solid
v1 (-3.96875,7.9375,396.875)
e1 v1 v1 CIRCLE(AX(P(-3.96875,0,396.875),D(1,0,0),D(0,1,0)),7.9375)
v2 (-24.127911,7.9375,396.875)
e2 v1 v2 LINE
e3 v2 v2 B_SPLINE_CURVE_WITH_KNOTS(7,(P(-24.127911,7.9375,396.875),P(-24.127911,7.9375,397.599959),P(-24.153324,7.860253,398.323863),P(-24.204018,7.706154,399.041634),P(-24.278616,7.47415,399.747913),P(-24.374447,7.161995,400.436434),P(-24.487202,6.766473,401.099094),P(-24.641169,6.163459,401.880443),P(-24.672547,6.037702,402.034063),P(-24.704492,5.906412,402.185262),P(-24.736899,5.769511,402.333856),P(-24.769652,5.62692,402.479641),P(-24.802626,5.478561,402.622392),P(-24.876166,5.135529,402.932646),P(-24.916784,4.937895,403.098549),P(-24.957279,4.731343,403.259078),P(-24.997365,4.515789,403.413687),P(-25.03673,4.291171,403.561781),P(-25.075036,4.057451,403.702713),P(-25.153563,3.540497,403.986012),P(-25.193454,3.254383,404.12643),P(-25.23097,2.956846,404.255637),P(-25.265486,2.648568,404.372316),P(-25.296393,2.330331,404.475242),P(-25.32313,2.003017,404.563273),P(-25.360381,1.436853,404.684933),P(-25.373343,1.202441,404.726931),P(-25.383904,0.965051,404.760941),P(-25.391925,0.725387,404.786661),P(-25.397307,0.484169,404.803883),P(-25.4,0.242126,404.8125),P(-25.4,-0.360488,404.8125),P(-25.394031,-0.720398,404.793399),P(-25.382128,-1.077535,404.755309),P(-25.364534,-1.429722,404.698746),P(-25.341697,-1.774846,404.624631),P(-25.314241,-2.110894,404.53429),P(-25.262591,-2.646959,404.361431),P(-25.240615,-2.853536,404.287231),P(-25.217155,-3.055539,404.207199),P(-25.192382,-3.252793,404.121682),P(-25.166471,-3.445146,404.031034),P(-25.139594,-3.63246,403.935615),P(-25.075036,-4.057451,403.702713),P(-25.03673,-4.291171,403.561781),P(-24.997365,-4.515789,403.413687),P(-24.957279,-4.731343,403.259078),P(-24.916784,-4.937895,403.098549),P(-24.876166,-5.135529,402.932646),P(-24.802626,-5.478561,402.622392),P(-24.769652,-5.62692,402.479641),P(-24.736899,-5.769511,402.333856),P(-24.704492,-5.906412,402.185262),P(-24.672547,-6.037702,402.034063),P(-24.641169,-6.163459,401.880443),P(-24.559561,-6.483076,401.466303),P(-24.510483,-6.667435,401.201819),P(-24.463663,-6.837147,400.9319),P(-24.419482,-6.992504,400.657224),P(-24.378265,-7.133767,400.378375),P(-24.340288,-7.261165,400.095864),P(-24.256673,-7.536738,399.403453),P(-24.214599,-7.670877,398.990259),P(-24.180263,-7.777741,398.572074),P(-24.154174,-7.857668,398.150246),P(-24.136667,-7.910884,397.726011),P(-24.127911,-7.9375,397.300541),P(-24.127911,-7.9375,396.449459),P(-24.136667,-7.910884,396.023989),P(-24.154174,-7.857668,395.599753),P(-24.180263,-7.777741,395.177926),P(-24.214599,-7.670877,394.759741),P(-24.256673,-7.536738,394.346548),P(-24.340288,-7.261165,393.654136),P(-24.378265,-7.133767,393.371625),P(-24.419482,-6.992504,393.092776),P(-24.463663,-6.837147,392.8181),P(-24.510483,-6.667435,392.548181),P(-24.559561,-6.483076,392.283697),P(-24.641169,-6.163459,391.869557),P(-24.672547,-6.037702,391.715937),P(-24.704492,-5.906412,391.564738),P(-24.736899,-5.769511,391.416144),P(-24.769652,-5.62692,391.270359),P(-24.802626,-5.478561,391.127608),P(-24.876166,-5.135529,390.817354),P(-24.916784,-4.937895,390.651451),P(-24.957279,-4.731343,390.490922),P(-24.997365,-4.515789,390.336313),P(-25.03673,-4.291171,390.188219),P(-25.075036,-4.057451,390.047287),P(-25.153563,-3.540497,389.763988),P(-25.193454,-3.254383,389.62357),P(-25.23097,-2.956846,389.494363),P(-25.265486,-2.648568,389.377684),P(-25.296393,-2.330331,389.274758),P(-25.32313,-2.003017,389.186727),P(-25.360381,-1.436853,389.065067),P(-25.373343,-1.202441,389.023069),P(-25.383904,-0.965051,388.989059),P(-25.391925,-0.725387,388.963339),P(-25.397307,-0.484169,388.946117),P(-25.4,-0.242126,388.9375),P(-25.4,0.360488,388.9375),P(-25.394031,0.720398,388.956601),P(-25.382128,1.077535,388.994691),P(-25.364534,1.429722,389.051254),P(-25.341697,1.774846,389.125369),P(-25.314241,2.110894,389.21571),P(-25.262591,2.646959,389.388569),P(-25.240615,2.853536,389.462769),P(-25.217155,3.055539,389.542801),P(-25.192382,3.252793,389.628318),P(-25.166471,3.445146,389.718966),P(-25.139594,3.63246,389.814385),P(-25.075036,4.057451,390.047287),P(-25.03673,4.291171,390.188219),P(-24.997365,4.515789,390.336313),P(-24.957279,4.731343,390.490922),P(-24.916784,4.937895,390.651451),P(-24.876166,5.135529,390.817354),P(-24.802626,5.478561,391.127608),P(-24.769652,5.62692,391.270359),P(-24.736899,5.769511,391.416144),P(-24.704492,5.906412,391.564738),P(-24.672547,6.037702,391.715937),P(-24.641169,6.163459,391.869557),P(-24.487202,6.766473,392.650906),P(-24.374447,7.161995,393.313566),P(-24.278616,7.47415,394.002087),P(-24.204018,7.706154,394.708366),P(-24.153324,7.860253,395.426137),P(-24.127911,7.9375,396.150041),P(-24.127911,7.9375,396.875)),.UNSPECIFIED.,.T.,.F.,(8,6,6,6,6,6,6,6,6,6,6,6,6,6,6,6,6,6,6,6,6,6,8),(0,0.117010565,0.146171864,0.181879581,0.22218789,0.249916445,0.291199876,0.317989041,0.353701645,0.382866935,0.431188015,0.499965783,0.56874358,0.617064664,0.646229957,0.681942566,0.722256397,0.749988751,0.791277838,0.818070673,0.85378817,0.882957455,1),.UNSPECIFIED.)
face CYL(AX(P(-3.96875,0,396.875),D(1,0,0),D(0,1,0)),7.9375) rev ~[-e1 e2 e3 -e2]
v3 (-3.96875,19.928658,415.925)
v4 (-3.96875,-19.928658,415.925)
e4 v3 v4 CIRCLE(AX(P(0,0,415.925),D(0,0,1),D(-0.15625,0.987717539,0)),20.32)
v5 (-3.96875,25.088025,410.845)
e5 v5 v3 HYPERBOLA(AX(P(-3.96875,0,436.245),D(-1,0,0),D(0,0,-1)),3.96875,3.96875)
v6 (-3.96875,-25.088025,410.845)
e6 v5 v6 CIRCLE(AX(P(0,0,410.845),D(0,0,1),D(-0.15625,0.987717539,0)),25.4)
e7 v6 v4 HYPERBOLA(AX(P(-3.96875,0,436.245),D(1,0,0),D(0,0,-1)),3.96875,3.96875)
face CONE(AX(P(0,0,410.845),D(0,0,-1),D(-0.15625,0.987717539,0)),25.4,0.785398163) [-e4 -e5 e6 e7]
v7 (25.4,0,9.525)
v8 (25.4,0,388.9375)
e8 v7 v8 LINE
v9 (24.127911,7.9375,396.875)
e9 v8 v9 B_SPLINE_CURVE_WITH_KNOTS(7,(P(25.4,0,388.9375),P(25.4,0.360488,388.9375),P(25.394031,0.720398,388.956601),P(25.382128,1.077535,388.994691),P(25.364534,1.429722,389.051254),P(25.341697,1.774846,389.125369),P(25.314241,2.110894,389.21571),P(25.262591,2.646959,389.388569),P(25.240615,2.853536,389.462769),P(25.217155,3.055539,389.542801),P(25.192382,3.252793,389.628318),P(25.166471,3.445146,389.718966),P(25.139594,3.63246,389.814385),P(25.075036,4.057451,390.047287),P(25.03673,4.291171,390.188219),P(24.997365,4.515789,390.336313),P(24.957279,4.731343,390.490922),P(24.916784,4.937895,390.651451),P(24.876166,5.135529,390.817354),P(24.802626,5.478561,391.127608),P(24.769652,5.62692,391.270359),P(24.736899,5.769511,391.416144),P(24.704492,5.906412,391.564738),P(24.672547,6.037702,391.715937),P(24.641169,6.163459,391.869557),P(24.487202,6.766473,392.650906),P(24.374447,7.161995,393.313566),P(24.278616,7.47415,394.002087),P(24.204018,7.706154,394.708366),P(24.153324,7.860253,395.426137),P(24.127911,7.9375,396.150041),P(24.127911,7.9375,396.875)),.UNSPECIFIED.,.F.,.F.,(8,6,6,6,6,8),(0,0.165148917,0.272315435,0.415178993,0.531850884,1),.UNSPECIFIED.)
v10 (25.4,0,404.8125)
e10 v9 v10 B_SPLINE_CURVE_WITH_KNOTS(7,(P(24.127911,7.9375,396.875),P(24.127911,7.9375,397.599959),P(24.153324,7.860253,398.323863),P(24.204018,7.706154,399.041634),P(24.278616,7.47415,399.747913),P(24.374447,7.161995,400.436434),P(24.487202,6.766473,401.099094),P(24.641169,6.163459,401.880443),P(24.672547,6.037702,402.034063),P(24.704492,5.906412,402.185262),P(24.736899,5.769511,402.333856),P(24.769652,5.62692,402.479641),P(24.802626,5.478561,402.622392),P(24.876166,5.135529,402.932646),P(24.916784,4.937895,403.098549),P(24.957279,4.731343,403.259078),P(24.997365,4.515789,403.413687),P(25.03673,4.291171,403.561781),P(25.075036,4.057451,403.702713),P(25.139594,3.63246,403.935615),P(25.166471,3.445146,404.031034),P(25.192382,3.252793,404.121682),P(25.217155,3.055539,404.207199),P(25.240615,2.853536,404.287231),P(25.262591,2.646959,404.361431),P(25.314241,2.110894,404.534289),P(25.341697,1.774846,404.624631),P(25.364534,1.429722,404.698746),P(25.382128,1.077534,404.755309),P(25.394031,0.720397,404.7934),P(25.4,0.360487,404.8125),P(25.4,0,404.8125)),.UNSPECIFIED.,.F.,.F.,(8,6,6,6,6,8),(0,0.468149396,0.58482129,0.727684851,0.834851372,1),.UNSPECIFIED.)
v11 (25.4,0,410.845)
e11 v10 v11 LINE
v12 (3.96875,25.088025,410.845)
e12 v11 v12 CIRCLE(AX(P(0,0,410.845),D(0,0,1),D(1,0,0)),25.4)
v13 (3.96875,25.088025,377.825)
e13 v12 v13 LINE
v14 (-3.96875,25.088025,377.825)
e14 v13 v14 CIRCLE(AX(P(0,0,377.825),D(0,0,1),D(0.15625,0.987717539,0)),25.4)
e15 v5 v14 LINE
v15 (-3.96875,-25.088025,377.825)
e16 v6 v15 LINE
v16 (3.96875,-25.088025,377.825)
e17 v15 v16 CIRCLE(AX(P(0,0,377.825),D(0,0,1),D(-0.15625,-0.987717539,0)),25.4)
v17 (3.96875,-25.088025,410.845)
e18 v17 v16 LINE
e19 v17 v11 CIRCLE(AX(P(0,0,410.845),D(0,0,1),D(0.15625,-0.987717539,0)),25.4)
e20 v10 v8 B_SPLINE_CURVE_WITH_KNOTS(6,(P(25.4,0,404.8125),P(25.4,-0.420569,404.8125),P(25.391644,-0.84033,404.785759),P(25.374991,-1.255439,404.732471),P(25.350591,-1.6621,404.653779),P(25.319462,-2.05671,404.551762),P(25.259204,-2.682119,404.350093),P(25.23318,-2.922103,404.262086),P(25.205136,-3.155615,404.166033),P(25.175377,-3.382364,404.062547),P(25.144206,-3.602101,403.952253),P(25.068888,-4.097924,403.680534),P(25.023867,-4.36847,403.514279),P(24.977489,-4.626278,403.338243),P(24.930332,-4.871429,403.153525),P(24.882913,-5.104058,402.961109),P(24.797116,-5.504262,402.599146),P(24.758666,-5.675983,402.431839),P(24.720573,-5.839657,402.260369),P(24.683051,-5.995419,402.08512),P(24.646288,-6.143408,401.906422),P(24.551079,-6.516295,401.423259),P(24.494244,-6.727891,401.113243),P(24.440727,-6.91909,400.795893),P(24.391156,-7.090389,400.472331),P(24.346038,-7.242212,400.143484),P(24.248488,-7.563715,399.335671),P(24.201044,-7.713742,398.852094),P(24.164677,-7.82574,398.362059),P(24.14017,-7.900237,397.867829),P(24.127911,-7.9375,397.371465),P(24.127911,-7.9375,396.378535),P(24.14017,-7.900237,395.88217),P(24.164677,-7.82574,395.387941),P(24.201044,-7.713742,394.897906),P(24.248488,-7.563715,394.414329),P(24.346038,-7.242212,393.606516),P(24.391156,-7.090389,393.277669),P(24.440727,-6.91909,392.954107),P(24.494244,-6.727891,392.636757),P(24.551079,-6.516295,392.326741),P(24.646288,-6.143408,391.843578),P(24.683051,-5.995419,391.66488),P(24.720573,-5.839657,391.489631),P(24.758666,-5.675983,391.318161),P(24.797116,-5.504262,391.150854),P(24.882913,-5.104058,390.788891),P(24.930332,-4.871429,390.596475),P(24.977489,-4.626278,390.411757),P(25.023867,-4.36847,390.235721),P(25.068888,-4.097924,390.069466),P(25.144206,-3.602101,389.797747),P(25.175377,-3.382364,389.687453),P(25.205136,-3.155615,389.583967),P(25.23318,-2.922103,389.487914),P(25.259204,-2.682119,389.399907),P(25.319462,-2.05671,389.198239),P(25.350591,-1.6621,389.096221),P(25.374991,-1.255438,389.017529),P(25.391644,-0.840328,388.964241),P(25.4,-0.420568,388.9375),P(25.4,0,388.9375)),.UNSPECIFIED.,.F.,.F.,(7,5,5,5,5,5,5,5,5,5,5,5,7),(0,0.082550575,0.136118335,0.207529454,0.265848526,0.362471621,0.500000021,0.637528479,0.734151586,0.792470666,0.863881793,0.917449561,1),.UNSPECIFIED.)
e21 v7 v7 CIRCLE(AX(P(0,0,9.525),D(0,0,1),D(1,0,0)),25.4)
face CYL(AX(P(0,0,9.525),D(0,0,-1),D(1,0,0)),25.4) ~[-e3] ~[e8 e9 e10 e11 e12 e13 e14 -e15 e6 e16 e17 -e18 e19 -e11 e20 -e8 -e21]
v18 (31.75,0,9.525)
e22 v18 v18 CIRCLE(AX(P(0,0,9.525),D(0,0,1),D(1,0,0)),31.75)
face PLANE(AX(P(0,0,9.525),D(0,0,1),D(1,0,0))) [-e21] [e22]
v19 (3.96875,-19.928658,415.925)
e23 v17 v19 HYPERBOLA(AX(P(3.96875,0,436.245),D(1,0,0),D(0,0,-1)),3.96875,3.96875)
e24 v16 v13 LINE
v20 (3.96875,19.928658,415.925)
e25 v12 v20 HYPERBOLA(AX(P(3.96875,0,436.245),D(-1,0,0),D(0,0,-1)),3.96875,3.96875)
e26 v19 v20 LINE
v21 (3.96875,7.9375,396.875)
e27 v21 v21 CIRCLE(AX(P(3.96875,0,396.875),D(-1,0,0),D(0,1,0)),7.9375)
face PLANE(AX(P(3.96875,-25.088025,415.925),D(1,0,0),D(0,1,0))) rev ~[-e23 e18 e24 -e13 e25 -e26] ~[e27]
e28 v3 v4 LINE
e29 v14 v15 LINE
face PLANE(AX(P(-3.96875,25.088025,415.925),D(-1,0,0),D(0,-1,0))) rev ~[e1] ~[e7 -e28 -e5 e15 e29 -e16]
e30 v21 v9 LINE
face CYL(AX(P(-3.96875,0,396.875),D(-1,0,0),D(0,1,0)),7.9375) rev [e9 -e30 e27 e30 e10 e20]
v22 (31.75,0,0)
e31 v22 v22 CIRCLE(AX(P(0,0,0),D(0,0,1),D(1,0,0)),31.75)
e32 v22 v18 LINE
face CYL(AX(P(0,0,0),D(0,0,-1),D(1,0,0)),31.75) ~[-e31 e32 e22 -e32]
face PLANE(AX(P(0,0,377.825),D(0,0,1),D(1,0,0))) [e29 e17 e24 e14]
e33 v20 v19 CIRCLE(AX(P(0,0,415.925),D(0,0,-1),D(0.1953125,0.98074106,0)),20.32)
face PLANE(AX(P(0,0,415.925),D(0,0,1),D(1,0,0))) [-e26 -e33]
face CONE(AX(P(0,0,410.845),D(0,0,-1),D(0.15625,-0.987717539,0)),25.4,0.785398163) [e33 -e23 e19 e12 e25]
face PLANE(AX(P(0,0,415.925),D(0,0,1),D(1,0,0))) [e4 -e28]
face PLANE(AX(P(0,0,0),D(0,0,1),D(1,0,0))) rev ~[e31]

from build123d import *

# Parameters (mm, degrees)
F0_R          = 31.75
F1_DEPTH      = 9.525
F2_R          = 25.4
F3_DEPTH      = 406.4
F5_DEPTH      = 38.1
F6_R          = 7.9375
F7_DEPTH      = 25.4
F7_DEPTH_BACK = 50.8
F8_SIZE       = 5.08


with BuildPart() as f1:
    # F0 (on Top) → F1 (new body)
    with BuildSketch(Plane.XY):
        Circle(F0_R)
    extrude(amount=F1_DEPTH)

    # F2 (on face) → F3 (join)
    with BuildSketch(Plane.XY.offset(9.525)):
        Circle(F2_R)
    extrude(amount=F3_DEPTH)

    # F4 (on face) → F5 (cut)
    with BuildSketch(Plane.XY.offset(415.925)):
        with BuildLine():
            ThreePointArc((3.96875, 25.088025499), (0, 25.4), (-3.96875, 25.088025499))
            Line((-3.96875, 25.088025499), (-3.96875, -25.088025499))
            ThreePointArc((-3.96875, -25.088025499), (0, -25.4), (3.96875, -25.088025499))
            Line((3.96875, -25.088025499), (3.96875, 25.088025499))
        make_face()
    extrude(amount=-F5_DEPTH, mode=Mode.SUBTRACT)

    # F6 (on face) → F7 (cut, two sides)
    with BuildSketch(Plane.YZ.offset(-3.96875)) as f7_sk:
        with Locations((0, 396.875)):
            Circle(F6_R)
    extrude(amount=-F7_DEPTH, mode=Mode.SUBTRACT)
    extrude(f7_sk.sketch, amount=F7_DEPTH_BACK, mode=Mode.SUBTRACT)

    # F8
    f8_edges = [f1.edges().sort_by_distance(p)[0] for p in [
        (-25.4, 0, 415.925),
        (19.312771, -16.497784, 415.925),
        (19.312771, 16.497784, 415.925),
    ]]
    chamfer(f8_edges, length=F8_SIZE)


solid = f1.part
